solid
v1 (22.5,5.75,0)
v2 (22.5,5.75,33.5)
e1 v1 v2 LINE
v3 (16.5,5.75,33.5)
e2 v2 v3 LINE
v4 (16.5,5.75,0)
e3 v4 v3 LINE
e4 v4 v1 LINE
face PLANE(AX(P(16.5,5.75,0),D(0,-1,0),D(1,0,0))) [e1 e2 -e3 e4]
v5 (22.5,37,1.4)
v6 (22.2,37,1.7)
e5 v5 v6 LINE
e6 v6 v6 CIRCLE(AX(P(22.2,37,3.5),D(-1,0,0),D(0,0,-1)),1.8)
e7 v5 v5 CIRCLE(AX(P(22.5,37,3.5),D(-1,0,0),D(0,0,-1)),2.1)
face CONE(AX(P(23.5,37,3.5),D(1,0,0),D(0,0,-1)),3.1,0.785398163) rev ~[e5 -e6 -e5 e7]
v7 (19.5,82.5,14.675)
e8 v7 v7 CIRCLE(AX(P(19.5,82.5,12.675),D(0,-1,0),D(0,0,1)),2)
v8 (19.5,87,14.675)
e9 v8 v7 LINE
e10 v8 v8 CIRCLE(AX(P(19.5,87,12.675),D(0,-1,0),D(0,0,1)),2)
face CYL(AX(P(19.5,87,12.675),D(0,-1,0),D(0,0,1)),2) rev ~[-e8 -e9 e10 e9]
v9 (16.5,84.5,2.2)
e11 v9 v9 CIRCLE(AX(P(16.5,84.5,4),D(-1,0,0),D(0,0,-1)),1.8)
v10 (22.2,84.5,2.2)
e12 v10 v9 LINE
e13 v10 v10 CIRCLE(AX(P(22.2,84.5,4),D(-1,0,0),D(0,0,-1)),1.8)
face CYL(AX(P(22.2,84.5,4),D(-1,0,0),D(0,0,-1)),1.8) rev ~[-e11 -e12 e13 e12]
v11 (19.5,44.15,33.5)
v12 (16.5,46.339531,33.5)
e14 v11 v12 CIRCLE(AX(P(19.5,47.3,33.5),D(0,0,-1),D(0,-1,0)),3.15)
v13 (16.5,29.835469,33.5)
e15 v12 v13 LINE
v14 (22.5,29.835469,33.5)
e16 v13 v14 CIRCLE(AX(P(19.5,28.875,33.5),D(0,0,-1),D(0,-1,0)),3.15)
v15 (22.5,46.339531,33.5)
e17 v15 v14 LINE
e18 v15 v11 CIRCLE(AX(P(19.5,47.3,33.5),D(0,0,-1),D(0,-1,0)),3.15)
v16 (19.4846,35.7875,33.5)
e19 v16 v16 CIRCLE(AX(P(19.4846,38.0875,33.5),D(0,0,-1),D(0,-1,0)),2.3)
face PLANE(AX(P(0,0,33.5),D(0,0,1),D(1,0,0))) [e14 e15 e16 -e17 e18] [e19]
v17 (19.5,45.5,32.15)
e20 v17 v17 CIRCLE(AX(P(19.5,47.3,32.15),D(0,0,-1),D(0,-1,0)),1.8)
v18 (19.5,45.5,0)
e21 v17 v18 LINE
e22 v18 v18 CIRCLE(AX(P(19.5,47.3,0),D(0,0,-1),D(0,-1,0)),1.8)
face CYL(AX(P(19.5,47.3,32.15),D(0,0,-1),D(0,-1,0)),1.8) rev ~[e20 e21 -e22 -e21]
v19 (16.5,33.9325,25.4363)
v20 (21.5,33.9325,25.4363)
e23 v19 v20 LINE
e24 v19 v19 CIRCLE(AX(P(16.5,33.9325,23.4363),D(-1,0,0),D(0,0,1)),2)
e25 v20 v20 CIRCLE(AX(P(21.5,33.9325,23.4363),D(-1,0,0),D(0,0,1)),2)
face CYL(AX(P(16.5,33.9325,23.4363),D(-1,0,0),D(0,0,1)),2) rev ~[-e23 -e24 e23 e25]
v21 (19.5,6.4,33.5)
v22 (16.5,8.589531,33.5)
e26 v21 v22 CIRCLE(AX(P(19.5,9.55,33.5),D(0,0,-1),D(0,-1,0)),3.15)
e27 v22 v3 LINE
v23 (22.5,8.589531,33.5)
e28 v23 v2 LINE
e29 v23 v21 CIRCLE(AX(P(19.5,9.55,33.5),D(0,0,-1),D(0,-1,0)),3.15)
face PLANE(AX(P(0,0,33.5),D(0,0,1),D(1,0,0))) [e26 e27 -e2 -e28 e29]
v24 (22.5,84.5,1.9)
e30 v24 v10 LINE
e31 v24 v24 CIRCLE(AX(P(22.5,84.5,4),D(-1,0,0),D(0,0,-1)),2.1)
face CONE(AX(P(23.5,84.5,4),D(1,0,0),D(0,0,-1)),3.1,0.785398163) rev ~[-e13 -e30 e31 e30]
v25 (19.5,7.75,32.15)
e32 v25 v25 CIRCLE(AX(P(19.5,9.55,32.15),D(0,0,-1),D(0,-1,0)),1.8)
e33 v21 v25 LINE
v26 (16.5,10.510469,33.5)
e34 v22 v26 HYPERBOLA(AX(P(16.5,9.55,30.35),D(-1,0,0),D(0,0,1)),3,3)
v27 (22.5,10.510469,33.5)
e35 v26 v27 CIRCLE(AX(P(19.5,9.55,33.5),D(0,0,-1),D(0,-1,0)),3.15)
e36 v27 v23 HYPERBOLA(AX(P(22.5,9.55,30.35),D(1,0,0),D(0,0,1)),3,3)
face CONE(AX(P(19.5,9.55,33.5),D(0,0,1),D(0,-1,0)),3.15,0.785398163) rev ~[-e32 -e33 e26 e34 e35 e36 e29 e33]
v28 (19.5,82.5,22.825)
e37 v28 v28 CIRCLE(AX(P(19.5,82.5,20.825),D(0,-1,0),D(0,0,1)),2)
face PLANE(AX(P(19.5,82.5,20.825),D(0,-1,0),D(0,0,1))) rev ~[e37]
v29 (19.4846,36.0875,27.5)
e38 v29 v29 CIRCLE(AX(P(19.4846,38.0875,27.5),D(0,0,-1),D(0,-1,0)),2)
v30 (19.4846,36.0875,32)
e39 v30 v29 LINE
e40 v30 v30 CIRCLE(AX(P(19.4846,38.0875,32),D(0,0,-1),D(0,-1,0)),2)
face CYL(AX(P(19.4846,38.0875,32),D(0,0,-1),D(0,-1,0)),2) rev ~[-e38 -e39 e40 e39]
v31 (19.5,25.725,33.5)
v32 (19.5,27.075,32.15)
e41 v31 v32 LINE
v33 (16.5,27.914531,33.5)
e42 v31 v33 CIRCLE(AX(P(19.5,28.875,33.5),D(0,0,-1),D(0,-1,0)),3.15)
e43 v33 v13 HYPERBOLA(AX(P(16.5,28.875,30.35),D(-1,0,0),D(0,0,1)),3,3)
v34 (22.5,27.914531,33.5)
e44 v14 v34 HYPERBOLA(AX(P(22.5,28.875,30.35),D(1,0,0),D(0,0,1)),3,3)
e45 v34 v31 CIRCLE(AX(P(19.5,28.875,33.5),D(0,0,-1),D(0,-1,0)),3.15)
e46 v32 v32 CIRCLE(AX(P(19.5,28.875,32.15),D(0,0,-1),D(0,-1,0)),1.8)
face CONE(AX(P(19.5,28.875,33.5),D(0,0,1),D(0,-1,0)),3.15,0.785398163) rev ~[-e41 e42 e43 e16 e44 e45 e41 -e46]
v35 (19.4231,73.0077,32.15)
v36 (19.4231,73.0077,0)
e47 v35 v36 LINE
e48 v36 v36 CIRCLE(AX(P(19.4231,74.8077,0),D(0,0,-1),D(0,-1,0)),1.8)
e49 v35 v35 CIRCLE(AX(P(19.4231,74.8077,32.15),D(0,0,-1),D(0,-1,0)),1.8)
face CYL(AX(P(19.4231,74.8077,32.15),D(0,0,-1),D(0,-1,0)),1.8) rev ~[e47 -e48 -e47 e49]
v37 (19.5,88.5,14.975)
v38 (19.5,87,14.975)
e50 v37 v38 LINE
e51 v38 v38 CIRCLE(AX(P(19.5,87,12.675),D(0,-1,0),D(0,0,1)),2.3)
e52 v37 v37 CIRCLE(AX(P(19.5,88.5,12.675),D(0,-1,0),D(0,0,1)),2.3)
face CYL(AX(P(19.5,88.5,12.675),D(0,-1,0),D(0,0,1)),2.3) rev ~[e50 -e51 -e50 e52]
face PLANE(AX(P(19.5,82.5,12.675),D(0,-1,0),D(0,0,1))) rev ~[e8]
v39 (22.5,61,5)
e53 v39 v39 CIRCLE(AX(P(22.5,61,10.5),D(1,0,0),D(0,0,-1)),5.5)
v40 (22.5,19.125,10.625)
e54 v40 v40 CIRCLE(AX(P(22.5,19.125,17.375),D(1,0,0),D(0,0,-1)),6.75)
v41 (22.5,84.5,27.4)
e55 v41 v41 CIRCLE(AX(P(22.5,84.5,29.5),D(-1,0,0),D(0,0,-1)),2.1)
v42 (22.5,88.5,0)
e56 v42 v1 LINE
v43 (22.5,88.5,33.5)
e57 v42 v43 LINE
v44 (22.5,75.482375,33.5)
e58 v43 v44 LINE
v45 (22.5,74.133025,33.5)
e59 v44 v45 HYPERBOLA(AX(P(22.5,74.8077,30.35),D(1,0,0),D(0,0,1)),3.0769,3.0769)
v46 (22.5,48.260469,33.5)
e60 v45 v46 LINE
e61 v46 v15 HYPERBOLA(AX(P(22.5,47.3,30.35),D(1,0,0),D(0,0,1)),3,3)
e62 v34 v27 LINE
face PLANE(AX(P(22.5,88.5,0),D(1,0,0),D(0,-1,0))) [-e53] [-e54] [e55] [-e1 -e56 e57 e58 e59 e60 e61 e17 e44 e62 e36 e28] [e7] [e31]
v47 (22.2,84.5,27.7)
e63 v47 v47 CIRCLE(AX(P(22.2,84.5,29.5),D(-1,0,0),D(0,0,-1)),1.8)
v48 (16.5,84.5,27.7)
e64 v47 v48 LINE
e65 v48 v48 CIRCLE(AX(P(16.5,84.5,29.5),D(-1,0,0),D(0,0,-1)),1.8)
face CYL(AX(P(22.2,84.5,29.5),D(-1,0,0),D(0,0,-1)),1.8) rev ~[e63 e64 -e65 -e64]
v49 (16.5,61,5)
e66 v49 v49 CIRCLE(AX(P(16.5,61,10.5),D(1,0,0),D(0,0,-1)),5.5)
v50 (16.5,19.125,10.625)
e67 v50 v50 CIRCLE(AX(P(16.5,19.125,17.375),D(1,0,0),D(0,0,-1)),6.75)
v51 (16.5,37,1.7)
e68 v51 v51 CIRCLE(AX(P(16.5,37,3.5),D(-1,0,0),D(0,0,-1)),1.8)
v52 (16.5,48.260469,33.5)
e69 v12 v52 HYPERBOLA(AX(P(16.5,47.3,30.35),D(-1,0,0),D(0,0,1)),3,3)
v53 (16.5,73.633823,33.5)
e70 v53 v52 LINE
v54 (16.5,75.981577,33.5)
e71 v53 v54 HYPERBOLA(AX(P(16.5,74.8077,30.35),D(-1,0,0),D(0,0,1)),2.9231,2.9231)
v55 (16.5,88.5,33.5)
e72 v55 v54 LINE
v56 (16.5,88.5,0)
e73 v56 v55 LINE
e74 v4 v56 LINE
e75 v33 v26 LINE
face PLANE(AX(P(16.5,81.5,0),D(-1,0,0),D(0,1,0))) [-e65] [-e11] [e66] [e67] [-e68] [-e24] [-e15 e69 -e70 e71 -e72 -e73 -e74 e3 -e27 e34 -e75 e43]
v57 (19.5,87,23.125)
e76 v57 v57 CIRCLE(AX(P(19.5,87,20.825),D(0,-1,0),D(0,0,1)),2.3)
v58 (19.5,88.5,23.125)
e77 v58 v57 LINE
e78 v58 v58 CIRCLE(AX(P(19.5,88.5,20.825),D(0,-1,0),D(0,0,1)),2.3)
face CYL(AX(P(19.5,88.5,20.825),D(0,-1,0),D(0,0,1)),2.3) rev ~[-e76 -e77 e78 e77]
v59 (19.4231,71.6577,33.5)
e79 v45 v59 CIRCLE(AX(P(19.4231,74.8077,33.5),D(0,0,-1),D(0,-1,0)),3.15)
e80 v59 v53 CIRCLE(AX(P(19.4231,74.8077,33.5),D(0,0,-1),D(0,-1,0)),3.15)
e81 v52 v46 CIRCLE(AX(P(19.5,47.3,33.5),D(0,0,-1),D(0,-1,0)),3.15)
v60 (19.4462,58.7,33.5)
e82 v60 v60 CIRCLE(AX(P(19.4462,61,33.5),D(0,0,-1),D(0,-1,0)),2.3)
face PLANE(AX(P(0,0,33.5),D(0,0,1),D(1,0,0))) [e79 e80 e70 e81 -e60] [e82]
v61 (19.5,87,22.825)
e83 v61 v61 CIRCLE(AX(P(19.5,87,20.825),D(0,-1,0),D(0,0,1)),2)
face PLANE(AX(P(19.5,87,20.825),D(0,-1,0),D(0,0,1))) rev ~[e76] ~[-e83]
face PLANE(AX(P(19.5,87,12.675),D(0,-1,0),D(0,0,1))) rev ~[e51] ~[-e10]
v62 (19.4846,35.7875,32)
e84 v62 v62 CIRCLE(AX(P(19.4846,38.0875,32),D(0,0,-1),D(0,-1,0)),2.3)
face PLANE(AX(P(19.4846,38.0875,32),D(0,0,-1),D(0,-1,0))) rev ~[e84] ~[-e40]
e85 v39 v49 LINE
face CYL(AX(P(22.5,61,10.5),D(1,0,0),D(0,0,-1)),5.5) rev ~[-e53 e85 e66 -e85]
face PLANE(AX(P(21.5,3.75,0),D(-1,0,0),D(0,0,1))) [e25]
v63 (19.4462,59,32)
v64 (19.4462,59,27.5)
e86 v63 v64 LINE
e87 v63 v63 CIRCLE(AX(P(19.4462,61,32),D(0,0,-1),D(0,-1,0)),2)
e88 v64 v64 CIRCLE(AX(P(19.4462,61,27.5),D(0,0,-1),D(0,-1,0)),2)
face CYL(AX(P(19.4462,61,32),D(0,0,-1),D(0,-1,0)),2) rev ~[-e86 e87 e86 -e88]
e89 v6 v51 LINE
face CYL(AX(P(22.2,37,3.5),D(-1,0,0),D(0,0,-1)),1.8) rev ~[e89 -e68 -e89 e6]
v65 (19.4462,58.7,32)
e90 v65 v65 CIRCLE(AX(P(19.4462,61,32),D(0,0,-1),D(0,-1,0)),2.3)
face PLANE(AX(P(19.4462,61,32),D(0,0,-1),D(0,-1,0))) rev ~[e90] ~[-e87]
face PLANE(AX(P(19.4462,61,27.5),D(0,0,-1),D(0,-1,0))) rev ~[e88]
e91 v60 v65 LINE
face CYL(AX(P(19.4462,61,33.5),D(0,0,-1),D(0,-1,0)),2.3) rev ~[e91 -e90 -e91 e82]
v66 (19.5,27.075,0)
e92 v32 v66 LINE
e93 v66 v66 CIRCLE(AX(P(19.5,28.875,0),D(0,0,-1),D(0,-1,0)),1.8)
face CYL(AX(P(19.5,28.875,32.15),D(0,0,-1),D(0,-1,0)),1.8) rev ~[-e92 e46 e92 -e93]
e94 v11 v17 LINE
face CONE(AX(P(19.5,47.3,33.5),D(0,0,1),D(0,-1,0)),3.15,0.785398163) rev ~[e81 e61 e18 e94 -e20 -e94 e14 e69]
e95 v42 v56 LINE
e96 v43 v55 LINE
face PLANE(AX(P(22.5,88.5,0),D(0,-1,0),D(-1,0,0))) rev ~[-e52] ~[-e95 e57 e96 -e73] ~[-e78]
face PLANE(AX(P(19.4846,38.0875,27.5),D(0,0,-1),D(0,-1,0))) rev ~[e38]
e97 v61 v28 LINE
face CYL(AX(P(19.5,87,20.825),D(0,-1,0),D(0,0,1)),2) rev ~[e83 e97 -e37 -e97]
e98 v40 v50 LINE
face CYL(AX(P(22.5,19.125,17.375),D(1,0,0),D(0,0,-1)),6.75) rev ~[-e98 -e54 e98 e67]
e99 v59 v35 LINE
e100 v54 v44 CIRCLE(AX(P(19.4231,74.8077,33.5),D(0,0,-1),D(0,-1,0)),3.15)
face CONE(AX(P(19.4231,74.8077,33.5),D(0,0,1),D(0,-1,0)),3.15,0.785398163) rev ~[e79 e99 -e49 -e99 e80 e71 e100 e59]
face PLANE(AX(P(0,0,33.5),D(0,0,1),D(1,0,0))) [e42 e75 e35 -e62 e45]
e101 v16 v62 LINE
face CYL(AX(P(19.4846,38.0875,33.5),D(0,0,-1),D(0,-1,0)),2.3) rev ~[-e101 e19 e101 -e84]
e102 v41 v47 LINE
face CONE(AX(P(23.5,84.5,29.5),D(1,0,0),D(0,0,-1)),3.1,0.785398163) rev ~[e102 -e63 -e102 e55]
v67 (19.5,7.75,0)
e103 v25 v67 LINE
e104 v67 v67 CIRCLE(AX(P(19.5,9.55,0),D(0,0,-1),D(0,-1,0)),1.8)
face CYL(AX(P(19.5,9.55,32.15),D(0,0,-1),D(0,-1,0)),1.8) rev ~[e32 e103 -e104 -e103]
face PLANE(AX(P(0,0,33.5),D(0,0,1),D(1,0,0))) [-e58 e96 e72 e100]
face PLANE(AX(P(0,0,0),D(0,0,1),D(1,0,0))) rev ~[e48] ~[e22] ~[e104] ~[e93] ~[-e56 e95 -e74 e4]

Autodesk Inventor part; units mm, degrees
ref_plane "YZ Plane" through (0, 0, 0) normal (1, 0, 0) x (0, 1, 0)
ref_plane "XZ Plane" through (0, 0, 0) normal (0, 1, 0) x (-1, 0, 0)
ref_plane "Work Plane1" through (0, 0, 0) normal (0, 0, 1) x (1, 0, 0)
sketch "Sketch1" plane through (0, 0, 0) normal (0, 0, 1) x (1, 0, 0)
  line L0 (23.5, 88.5) -> (-23.5, 88.5) projected
  line L1 (-23.5, 88.5) -> (-23.5, 36.5) projected
  line L2 (-26.5, 33.5) -> (-89, 33.5) projected
  line L3 (-89, 33.5) -> (-89, -72.5) projected
  line L4 (-89, -72.5) -> (-77, -72.5) projected
  line L5 (-74, -75.5) -> (-74, -93.5) projected
  line L6 (-74, -93.5) -> (74, -93.5) projected
  line L7 (74, -93.5) -> (74, -75.5) projected
  line L8 (77, -72.5) -> (89, -72.5) projected
  line L9 (89, -72.5) -> (89, 33.5) projected
  line L10 (89, 33.5) -> (26.5, 33.5) projected
  line L11 (23.5, 36.5) -> (23.5, 88.5) projected
  line L12 (-4.5, 81.5) -> (-4.5, 36.5) projected
  line L13 (-7.5, 33.5) -> (-13.5, 33.5) projected
  line L14 (-16.5, 36.5) -> (-16.5, 81.5) projected
  line L15 (-13.5, 84.5) -> (-7.5, 84.5) projected
  line L16 (16.5, 81.5) -> (16.5, 36.5) projected
  line L17 (13.5, 33.5) -> (7.5, 33.5) projected
  line L18 (4.5, 36.5) -> (4.5, 81.5) projected
  line L19 (7.5, 84.5) -> (13.5, 84.5) projected
  line L20 (16.5, 88.5) -> (22.5, 88.5)
  line L21 (22.5, 88.5) -> (22.5, 3.75)
  line L22 (22.5, 3.75) -> (16.5, 3.75)
  line L23 (16.5, 3.75) -> (16.5, 88.5)
  line L24 (59.9, 4.75) -> (32.2, 4.75)
  arc A0 (13.5, 33.5) -> (16.5, 36.5) centre (13.5, 36.5) ccw projected
  arc A1 (4.5, 36.5) -> (7.5, 33.5) centre (7.5, 36.5) ccw projected
  arc A2 (7.5, 84.5) -> (4.5, 81.5) centre (7.5, 81.5) ccw projected
  arc A3 (16.5, 81.5) -> (13.5, 84.5) centre (13.5, 81.5) ccw projected
  arc A4 (-4.5, 81.5) -> (-7.5, 84.5) centre (-7.5, 81.5) ccw projected
  arc A5 (-7.5, 33.5) -> (-4.5, 36.5) centre (-7.5, 36.5) ccw projected
  arc A6 (-16.5, 36.5) -> (-13.5, 33.5) centre (-13.5, 36.5) ccw projected
  arc A7 (-13.5, 84.5) -> (-16.5, 81.5) centre (-13.5, 81.5) ccw projected
  arc A8 (-26.5, 33.5) -> (-23.5, 36.5) centre (-26.5, 36.5) ccw projected
  arc A9 (-74, -75.5) -> (-77, -72.5) centre (-77, -75.5) ccw projected
  arc A10 (77, -72.5) -> (74, -75.5) centre (77, -75.5) ccw projected
  arc A11 (23.5, 36.5) -> (26.5, 33.5) centre (26.5, 36.5) ccw projected
  point P0 (0, 0)
  dimension "d0" = 1
  dimension "d1" = 1
ref_plane "Work Plane2" through (-89, -40.3889, 33.5) normal (0, 0, 1) x (1, 0, 0)
extrude "Extrusion1" add sketch "Sketch1" along normal up to surface (33.5 mm away) contours L21 L22 L23 L16 L0
sketch "Sketch2" plane through (22.5, 3.75, 0) normal (1, 0, 0) x (0, 0, -1)
  circle A0 centre (-17.375, 15.375) radius 6.75 projected
  circle A1 centre (-10.5, 57.25) radius 5.5 projected
  point P0 (0, -3.75)
  dimension "d8" = 11
extrude "Extrusion2" cut sketch "Sketch2" against normal up to next
sketch "Sketch3" plane through (16.5, 3.75, 0) normal (-1, 0, 0) x (0, 0, 1)
  circle A0 centre (23.4363, 30.1825) radius 2 projected
  point P0 (0, -3.75)
extrude "Extrusion3" cut sketch "Sketch3" against normal blind 5
ref_plane "Work Plane3" through (23.5, 3.75, 0) normal (1, 0, 0) x (0, 0, -1)
sketch "Sketch4" plane through (23.5, 3.75, 0) normal (1, 0, 0) x (0, 0, -1)
  circle A0 centre (-29.5, 80.75) radius 1.8 projected
  circle A1 centre (-3.5, 33.25) radius 1.8 projected
  circle A2 centre (-4, 80.75) radius 1.8 projected
  point P0 (0, -3.75)
hole "Hole1" at (23.5, 37, 3.5) at (23.5, 84.5, 4) at (23.5, 84.5, 29.5) direction (-1, 0, 0) diameter 3.6 end through all countersink diameter 6.2 countersink angle 90 clearance for "Countersunk Flat Head Screw ISO 2009/7046" size "M3" standard "ISO"
sketch "Sketch5" plane through (16.5, 3.75, 33.5) normal (0, 0, 1) x (1, 0, 0)
  circle A0 centre (-36, 5.8) radius 1.8 projected
  circle A1 centre (-36, 25.125) radius 1.8 projected
  circle A2 centre (-36, 43.55) radius 1.8 projected
  circle A3 centre (-35.9231, 71.0577) radius 1.8 projected
  circle A4 centre (-16.5, 45.3) radius 3.3 projected
  circle A5 centre (-16.5, 15.375) radius 3.3 projected
  circle A6 centre (-16.5, 70.95) radius 3.3 projected
  line L0 (-12, 2) -> (-21, 2) projected
  line L1 (-12, 84.75) -> (-12, 2) projected
  line L2 (-21, 84.75) -> (-12, 84.75) projected
  line L3 (-21, 2) -> (-21, 84.75) projected
  line L4 (-16.5, 2) -> (-16.5, 84.75)
  circle A7 centre (3, 5.8) radius 1.8
  circle A8 centre (3, 25.125) radius 1.8
  circle A9 centre (3, 43.55) radius 1.8
  circle A10 centre (2.9231, 71.0577) radius 1.8
  circle A11 centre (-16.5, 30.7161) radius 2.3 projected
  circle A12 centre (-16.5, 59.25) radius 2.3 projected
  point P0 (-16.5, -3.75)
hole "Hole2" at (19.5, 9.55, 33.5) at (19.5, 28.875, 33.5) at (19.5, 47.3, 33.5) at (19.4231, 74.8077, 33.5) direction (0, 0, -1) diameter 3.6 end through all countersink diameter 6.3 countersink angle 90 clearance for "Countersunk Flat Head Screw ISO 2009/7046" size "M3" standard "ISO"
sketch "Sketch7" plane through (16.5, 88.5, 0) normal (0, 1, 0) x (1, 0, 0)
  line L0 (0, -33.5) -> (6, -33.5) projected
  line L1 (6, 0) -> (6, -33.5) projected
  line L2 (6, 0) -> (0, 0) projected
  line L3 (0, 0) -> (0, -33.5) projected
  circle A0 centre (-16.5, -12.675) radius 2 projected
  circle A1 centre (-16.5, -20.825) radius 2 projected
  line L4 (-16.5, -20.825) -> (6, -20.825)
  line L5 (-16.5, -12.675) -> (6, -12.675)
  line L6 (6, -5) -> (6, -16) projected
  point P0 (-16.5, 0)
  point P1 (3, -20.825)
  point P2 (3, -12.675)
hole "Hole4" at (19.5, 88.5, 20.825) at (19.5, 88.5, 12.675) direction (0, -1, 0) diameter 4 depth 6 counterbore diameter 4.6 counterbore depth 1.5
sketch "Sketch8" plane through (19.5, 47.3, 33.5) normal (0, 0, 1) x (1, 0, 0)
  circle A0 centre (-39, -9.2125) radius 2.3 projected
  circle A1 centre (-39, 13.7) radius 2.3 projected
  arc A2 (3, 0.9605) -> (-3, 0.9605) centre (0, 0) ccw projected
  line L0 (3, 26.8331) -> (3, 0.9605) projected
  arc A3 (-3, 26.3338) -> (3, 26.8331) centre (-0.0769, 27.5077) ccw projected
  line L1 (-3, 0.9605) -> (-3, 26.3338) projected
  arc A4 (-3, -0.9605) -> (3, -0.9605) centre (0, 0) ccw projected
  line L2 (-3, -17.4645) -> (-3, -0.9605) projected
  arc A5 (3, -17.4645) -> (-3, -17.4645) centre (0, -18.425) ccw projected
  line L3 (3, -0.9605) -> (3, -17.4645) projected
  line L4 (-39, 13.7) -> (3, 13.7)
  line L5 (3, 19.2) -> (3, 8.2) projected
  line L6 (-39, -9.2125) -> (3, -9.2125)
  circle A6 centre (0, -18.425) radius 1.8 projected
  line L7 (0, -18.425) -> (-0.0769, 27.5077)
  point P0 (-19.5, -47.3)
  point P1 (-0.0538, 13.7)
  point P2 (-0.0154, -9.2125)
hole "Hole5" at (19.4462, 61, 33.5) at (19.4846, 38.0875, 33.5) direction (0, 0, -1) diameter 4 depth 6 counterbore diameter 4.6 counterbore depth 1.5
sketch "Sketch9" plane through (16.5, 3.75, 0) normal (0, -1, 0) x (1, 0, 0)
  line L0 (0, 0) -> (0, 33.5) projected
  line L1 (0, 0) -> (6, 0) projected
  line L2 (6, 0) -> (6, 33.5) projected
  line L3 (6, 33.5) -> (0, 33.5) projected
  point P0 (-16.5, 0)
extrude "Extrusion4" cut sketch "Sketch9" against normal blind 2
properties part number "left_gear_holder"
